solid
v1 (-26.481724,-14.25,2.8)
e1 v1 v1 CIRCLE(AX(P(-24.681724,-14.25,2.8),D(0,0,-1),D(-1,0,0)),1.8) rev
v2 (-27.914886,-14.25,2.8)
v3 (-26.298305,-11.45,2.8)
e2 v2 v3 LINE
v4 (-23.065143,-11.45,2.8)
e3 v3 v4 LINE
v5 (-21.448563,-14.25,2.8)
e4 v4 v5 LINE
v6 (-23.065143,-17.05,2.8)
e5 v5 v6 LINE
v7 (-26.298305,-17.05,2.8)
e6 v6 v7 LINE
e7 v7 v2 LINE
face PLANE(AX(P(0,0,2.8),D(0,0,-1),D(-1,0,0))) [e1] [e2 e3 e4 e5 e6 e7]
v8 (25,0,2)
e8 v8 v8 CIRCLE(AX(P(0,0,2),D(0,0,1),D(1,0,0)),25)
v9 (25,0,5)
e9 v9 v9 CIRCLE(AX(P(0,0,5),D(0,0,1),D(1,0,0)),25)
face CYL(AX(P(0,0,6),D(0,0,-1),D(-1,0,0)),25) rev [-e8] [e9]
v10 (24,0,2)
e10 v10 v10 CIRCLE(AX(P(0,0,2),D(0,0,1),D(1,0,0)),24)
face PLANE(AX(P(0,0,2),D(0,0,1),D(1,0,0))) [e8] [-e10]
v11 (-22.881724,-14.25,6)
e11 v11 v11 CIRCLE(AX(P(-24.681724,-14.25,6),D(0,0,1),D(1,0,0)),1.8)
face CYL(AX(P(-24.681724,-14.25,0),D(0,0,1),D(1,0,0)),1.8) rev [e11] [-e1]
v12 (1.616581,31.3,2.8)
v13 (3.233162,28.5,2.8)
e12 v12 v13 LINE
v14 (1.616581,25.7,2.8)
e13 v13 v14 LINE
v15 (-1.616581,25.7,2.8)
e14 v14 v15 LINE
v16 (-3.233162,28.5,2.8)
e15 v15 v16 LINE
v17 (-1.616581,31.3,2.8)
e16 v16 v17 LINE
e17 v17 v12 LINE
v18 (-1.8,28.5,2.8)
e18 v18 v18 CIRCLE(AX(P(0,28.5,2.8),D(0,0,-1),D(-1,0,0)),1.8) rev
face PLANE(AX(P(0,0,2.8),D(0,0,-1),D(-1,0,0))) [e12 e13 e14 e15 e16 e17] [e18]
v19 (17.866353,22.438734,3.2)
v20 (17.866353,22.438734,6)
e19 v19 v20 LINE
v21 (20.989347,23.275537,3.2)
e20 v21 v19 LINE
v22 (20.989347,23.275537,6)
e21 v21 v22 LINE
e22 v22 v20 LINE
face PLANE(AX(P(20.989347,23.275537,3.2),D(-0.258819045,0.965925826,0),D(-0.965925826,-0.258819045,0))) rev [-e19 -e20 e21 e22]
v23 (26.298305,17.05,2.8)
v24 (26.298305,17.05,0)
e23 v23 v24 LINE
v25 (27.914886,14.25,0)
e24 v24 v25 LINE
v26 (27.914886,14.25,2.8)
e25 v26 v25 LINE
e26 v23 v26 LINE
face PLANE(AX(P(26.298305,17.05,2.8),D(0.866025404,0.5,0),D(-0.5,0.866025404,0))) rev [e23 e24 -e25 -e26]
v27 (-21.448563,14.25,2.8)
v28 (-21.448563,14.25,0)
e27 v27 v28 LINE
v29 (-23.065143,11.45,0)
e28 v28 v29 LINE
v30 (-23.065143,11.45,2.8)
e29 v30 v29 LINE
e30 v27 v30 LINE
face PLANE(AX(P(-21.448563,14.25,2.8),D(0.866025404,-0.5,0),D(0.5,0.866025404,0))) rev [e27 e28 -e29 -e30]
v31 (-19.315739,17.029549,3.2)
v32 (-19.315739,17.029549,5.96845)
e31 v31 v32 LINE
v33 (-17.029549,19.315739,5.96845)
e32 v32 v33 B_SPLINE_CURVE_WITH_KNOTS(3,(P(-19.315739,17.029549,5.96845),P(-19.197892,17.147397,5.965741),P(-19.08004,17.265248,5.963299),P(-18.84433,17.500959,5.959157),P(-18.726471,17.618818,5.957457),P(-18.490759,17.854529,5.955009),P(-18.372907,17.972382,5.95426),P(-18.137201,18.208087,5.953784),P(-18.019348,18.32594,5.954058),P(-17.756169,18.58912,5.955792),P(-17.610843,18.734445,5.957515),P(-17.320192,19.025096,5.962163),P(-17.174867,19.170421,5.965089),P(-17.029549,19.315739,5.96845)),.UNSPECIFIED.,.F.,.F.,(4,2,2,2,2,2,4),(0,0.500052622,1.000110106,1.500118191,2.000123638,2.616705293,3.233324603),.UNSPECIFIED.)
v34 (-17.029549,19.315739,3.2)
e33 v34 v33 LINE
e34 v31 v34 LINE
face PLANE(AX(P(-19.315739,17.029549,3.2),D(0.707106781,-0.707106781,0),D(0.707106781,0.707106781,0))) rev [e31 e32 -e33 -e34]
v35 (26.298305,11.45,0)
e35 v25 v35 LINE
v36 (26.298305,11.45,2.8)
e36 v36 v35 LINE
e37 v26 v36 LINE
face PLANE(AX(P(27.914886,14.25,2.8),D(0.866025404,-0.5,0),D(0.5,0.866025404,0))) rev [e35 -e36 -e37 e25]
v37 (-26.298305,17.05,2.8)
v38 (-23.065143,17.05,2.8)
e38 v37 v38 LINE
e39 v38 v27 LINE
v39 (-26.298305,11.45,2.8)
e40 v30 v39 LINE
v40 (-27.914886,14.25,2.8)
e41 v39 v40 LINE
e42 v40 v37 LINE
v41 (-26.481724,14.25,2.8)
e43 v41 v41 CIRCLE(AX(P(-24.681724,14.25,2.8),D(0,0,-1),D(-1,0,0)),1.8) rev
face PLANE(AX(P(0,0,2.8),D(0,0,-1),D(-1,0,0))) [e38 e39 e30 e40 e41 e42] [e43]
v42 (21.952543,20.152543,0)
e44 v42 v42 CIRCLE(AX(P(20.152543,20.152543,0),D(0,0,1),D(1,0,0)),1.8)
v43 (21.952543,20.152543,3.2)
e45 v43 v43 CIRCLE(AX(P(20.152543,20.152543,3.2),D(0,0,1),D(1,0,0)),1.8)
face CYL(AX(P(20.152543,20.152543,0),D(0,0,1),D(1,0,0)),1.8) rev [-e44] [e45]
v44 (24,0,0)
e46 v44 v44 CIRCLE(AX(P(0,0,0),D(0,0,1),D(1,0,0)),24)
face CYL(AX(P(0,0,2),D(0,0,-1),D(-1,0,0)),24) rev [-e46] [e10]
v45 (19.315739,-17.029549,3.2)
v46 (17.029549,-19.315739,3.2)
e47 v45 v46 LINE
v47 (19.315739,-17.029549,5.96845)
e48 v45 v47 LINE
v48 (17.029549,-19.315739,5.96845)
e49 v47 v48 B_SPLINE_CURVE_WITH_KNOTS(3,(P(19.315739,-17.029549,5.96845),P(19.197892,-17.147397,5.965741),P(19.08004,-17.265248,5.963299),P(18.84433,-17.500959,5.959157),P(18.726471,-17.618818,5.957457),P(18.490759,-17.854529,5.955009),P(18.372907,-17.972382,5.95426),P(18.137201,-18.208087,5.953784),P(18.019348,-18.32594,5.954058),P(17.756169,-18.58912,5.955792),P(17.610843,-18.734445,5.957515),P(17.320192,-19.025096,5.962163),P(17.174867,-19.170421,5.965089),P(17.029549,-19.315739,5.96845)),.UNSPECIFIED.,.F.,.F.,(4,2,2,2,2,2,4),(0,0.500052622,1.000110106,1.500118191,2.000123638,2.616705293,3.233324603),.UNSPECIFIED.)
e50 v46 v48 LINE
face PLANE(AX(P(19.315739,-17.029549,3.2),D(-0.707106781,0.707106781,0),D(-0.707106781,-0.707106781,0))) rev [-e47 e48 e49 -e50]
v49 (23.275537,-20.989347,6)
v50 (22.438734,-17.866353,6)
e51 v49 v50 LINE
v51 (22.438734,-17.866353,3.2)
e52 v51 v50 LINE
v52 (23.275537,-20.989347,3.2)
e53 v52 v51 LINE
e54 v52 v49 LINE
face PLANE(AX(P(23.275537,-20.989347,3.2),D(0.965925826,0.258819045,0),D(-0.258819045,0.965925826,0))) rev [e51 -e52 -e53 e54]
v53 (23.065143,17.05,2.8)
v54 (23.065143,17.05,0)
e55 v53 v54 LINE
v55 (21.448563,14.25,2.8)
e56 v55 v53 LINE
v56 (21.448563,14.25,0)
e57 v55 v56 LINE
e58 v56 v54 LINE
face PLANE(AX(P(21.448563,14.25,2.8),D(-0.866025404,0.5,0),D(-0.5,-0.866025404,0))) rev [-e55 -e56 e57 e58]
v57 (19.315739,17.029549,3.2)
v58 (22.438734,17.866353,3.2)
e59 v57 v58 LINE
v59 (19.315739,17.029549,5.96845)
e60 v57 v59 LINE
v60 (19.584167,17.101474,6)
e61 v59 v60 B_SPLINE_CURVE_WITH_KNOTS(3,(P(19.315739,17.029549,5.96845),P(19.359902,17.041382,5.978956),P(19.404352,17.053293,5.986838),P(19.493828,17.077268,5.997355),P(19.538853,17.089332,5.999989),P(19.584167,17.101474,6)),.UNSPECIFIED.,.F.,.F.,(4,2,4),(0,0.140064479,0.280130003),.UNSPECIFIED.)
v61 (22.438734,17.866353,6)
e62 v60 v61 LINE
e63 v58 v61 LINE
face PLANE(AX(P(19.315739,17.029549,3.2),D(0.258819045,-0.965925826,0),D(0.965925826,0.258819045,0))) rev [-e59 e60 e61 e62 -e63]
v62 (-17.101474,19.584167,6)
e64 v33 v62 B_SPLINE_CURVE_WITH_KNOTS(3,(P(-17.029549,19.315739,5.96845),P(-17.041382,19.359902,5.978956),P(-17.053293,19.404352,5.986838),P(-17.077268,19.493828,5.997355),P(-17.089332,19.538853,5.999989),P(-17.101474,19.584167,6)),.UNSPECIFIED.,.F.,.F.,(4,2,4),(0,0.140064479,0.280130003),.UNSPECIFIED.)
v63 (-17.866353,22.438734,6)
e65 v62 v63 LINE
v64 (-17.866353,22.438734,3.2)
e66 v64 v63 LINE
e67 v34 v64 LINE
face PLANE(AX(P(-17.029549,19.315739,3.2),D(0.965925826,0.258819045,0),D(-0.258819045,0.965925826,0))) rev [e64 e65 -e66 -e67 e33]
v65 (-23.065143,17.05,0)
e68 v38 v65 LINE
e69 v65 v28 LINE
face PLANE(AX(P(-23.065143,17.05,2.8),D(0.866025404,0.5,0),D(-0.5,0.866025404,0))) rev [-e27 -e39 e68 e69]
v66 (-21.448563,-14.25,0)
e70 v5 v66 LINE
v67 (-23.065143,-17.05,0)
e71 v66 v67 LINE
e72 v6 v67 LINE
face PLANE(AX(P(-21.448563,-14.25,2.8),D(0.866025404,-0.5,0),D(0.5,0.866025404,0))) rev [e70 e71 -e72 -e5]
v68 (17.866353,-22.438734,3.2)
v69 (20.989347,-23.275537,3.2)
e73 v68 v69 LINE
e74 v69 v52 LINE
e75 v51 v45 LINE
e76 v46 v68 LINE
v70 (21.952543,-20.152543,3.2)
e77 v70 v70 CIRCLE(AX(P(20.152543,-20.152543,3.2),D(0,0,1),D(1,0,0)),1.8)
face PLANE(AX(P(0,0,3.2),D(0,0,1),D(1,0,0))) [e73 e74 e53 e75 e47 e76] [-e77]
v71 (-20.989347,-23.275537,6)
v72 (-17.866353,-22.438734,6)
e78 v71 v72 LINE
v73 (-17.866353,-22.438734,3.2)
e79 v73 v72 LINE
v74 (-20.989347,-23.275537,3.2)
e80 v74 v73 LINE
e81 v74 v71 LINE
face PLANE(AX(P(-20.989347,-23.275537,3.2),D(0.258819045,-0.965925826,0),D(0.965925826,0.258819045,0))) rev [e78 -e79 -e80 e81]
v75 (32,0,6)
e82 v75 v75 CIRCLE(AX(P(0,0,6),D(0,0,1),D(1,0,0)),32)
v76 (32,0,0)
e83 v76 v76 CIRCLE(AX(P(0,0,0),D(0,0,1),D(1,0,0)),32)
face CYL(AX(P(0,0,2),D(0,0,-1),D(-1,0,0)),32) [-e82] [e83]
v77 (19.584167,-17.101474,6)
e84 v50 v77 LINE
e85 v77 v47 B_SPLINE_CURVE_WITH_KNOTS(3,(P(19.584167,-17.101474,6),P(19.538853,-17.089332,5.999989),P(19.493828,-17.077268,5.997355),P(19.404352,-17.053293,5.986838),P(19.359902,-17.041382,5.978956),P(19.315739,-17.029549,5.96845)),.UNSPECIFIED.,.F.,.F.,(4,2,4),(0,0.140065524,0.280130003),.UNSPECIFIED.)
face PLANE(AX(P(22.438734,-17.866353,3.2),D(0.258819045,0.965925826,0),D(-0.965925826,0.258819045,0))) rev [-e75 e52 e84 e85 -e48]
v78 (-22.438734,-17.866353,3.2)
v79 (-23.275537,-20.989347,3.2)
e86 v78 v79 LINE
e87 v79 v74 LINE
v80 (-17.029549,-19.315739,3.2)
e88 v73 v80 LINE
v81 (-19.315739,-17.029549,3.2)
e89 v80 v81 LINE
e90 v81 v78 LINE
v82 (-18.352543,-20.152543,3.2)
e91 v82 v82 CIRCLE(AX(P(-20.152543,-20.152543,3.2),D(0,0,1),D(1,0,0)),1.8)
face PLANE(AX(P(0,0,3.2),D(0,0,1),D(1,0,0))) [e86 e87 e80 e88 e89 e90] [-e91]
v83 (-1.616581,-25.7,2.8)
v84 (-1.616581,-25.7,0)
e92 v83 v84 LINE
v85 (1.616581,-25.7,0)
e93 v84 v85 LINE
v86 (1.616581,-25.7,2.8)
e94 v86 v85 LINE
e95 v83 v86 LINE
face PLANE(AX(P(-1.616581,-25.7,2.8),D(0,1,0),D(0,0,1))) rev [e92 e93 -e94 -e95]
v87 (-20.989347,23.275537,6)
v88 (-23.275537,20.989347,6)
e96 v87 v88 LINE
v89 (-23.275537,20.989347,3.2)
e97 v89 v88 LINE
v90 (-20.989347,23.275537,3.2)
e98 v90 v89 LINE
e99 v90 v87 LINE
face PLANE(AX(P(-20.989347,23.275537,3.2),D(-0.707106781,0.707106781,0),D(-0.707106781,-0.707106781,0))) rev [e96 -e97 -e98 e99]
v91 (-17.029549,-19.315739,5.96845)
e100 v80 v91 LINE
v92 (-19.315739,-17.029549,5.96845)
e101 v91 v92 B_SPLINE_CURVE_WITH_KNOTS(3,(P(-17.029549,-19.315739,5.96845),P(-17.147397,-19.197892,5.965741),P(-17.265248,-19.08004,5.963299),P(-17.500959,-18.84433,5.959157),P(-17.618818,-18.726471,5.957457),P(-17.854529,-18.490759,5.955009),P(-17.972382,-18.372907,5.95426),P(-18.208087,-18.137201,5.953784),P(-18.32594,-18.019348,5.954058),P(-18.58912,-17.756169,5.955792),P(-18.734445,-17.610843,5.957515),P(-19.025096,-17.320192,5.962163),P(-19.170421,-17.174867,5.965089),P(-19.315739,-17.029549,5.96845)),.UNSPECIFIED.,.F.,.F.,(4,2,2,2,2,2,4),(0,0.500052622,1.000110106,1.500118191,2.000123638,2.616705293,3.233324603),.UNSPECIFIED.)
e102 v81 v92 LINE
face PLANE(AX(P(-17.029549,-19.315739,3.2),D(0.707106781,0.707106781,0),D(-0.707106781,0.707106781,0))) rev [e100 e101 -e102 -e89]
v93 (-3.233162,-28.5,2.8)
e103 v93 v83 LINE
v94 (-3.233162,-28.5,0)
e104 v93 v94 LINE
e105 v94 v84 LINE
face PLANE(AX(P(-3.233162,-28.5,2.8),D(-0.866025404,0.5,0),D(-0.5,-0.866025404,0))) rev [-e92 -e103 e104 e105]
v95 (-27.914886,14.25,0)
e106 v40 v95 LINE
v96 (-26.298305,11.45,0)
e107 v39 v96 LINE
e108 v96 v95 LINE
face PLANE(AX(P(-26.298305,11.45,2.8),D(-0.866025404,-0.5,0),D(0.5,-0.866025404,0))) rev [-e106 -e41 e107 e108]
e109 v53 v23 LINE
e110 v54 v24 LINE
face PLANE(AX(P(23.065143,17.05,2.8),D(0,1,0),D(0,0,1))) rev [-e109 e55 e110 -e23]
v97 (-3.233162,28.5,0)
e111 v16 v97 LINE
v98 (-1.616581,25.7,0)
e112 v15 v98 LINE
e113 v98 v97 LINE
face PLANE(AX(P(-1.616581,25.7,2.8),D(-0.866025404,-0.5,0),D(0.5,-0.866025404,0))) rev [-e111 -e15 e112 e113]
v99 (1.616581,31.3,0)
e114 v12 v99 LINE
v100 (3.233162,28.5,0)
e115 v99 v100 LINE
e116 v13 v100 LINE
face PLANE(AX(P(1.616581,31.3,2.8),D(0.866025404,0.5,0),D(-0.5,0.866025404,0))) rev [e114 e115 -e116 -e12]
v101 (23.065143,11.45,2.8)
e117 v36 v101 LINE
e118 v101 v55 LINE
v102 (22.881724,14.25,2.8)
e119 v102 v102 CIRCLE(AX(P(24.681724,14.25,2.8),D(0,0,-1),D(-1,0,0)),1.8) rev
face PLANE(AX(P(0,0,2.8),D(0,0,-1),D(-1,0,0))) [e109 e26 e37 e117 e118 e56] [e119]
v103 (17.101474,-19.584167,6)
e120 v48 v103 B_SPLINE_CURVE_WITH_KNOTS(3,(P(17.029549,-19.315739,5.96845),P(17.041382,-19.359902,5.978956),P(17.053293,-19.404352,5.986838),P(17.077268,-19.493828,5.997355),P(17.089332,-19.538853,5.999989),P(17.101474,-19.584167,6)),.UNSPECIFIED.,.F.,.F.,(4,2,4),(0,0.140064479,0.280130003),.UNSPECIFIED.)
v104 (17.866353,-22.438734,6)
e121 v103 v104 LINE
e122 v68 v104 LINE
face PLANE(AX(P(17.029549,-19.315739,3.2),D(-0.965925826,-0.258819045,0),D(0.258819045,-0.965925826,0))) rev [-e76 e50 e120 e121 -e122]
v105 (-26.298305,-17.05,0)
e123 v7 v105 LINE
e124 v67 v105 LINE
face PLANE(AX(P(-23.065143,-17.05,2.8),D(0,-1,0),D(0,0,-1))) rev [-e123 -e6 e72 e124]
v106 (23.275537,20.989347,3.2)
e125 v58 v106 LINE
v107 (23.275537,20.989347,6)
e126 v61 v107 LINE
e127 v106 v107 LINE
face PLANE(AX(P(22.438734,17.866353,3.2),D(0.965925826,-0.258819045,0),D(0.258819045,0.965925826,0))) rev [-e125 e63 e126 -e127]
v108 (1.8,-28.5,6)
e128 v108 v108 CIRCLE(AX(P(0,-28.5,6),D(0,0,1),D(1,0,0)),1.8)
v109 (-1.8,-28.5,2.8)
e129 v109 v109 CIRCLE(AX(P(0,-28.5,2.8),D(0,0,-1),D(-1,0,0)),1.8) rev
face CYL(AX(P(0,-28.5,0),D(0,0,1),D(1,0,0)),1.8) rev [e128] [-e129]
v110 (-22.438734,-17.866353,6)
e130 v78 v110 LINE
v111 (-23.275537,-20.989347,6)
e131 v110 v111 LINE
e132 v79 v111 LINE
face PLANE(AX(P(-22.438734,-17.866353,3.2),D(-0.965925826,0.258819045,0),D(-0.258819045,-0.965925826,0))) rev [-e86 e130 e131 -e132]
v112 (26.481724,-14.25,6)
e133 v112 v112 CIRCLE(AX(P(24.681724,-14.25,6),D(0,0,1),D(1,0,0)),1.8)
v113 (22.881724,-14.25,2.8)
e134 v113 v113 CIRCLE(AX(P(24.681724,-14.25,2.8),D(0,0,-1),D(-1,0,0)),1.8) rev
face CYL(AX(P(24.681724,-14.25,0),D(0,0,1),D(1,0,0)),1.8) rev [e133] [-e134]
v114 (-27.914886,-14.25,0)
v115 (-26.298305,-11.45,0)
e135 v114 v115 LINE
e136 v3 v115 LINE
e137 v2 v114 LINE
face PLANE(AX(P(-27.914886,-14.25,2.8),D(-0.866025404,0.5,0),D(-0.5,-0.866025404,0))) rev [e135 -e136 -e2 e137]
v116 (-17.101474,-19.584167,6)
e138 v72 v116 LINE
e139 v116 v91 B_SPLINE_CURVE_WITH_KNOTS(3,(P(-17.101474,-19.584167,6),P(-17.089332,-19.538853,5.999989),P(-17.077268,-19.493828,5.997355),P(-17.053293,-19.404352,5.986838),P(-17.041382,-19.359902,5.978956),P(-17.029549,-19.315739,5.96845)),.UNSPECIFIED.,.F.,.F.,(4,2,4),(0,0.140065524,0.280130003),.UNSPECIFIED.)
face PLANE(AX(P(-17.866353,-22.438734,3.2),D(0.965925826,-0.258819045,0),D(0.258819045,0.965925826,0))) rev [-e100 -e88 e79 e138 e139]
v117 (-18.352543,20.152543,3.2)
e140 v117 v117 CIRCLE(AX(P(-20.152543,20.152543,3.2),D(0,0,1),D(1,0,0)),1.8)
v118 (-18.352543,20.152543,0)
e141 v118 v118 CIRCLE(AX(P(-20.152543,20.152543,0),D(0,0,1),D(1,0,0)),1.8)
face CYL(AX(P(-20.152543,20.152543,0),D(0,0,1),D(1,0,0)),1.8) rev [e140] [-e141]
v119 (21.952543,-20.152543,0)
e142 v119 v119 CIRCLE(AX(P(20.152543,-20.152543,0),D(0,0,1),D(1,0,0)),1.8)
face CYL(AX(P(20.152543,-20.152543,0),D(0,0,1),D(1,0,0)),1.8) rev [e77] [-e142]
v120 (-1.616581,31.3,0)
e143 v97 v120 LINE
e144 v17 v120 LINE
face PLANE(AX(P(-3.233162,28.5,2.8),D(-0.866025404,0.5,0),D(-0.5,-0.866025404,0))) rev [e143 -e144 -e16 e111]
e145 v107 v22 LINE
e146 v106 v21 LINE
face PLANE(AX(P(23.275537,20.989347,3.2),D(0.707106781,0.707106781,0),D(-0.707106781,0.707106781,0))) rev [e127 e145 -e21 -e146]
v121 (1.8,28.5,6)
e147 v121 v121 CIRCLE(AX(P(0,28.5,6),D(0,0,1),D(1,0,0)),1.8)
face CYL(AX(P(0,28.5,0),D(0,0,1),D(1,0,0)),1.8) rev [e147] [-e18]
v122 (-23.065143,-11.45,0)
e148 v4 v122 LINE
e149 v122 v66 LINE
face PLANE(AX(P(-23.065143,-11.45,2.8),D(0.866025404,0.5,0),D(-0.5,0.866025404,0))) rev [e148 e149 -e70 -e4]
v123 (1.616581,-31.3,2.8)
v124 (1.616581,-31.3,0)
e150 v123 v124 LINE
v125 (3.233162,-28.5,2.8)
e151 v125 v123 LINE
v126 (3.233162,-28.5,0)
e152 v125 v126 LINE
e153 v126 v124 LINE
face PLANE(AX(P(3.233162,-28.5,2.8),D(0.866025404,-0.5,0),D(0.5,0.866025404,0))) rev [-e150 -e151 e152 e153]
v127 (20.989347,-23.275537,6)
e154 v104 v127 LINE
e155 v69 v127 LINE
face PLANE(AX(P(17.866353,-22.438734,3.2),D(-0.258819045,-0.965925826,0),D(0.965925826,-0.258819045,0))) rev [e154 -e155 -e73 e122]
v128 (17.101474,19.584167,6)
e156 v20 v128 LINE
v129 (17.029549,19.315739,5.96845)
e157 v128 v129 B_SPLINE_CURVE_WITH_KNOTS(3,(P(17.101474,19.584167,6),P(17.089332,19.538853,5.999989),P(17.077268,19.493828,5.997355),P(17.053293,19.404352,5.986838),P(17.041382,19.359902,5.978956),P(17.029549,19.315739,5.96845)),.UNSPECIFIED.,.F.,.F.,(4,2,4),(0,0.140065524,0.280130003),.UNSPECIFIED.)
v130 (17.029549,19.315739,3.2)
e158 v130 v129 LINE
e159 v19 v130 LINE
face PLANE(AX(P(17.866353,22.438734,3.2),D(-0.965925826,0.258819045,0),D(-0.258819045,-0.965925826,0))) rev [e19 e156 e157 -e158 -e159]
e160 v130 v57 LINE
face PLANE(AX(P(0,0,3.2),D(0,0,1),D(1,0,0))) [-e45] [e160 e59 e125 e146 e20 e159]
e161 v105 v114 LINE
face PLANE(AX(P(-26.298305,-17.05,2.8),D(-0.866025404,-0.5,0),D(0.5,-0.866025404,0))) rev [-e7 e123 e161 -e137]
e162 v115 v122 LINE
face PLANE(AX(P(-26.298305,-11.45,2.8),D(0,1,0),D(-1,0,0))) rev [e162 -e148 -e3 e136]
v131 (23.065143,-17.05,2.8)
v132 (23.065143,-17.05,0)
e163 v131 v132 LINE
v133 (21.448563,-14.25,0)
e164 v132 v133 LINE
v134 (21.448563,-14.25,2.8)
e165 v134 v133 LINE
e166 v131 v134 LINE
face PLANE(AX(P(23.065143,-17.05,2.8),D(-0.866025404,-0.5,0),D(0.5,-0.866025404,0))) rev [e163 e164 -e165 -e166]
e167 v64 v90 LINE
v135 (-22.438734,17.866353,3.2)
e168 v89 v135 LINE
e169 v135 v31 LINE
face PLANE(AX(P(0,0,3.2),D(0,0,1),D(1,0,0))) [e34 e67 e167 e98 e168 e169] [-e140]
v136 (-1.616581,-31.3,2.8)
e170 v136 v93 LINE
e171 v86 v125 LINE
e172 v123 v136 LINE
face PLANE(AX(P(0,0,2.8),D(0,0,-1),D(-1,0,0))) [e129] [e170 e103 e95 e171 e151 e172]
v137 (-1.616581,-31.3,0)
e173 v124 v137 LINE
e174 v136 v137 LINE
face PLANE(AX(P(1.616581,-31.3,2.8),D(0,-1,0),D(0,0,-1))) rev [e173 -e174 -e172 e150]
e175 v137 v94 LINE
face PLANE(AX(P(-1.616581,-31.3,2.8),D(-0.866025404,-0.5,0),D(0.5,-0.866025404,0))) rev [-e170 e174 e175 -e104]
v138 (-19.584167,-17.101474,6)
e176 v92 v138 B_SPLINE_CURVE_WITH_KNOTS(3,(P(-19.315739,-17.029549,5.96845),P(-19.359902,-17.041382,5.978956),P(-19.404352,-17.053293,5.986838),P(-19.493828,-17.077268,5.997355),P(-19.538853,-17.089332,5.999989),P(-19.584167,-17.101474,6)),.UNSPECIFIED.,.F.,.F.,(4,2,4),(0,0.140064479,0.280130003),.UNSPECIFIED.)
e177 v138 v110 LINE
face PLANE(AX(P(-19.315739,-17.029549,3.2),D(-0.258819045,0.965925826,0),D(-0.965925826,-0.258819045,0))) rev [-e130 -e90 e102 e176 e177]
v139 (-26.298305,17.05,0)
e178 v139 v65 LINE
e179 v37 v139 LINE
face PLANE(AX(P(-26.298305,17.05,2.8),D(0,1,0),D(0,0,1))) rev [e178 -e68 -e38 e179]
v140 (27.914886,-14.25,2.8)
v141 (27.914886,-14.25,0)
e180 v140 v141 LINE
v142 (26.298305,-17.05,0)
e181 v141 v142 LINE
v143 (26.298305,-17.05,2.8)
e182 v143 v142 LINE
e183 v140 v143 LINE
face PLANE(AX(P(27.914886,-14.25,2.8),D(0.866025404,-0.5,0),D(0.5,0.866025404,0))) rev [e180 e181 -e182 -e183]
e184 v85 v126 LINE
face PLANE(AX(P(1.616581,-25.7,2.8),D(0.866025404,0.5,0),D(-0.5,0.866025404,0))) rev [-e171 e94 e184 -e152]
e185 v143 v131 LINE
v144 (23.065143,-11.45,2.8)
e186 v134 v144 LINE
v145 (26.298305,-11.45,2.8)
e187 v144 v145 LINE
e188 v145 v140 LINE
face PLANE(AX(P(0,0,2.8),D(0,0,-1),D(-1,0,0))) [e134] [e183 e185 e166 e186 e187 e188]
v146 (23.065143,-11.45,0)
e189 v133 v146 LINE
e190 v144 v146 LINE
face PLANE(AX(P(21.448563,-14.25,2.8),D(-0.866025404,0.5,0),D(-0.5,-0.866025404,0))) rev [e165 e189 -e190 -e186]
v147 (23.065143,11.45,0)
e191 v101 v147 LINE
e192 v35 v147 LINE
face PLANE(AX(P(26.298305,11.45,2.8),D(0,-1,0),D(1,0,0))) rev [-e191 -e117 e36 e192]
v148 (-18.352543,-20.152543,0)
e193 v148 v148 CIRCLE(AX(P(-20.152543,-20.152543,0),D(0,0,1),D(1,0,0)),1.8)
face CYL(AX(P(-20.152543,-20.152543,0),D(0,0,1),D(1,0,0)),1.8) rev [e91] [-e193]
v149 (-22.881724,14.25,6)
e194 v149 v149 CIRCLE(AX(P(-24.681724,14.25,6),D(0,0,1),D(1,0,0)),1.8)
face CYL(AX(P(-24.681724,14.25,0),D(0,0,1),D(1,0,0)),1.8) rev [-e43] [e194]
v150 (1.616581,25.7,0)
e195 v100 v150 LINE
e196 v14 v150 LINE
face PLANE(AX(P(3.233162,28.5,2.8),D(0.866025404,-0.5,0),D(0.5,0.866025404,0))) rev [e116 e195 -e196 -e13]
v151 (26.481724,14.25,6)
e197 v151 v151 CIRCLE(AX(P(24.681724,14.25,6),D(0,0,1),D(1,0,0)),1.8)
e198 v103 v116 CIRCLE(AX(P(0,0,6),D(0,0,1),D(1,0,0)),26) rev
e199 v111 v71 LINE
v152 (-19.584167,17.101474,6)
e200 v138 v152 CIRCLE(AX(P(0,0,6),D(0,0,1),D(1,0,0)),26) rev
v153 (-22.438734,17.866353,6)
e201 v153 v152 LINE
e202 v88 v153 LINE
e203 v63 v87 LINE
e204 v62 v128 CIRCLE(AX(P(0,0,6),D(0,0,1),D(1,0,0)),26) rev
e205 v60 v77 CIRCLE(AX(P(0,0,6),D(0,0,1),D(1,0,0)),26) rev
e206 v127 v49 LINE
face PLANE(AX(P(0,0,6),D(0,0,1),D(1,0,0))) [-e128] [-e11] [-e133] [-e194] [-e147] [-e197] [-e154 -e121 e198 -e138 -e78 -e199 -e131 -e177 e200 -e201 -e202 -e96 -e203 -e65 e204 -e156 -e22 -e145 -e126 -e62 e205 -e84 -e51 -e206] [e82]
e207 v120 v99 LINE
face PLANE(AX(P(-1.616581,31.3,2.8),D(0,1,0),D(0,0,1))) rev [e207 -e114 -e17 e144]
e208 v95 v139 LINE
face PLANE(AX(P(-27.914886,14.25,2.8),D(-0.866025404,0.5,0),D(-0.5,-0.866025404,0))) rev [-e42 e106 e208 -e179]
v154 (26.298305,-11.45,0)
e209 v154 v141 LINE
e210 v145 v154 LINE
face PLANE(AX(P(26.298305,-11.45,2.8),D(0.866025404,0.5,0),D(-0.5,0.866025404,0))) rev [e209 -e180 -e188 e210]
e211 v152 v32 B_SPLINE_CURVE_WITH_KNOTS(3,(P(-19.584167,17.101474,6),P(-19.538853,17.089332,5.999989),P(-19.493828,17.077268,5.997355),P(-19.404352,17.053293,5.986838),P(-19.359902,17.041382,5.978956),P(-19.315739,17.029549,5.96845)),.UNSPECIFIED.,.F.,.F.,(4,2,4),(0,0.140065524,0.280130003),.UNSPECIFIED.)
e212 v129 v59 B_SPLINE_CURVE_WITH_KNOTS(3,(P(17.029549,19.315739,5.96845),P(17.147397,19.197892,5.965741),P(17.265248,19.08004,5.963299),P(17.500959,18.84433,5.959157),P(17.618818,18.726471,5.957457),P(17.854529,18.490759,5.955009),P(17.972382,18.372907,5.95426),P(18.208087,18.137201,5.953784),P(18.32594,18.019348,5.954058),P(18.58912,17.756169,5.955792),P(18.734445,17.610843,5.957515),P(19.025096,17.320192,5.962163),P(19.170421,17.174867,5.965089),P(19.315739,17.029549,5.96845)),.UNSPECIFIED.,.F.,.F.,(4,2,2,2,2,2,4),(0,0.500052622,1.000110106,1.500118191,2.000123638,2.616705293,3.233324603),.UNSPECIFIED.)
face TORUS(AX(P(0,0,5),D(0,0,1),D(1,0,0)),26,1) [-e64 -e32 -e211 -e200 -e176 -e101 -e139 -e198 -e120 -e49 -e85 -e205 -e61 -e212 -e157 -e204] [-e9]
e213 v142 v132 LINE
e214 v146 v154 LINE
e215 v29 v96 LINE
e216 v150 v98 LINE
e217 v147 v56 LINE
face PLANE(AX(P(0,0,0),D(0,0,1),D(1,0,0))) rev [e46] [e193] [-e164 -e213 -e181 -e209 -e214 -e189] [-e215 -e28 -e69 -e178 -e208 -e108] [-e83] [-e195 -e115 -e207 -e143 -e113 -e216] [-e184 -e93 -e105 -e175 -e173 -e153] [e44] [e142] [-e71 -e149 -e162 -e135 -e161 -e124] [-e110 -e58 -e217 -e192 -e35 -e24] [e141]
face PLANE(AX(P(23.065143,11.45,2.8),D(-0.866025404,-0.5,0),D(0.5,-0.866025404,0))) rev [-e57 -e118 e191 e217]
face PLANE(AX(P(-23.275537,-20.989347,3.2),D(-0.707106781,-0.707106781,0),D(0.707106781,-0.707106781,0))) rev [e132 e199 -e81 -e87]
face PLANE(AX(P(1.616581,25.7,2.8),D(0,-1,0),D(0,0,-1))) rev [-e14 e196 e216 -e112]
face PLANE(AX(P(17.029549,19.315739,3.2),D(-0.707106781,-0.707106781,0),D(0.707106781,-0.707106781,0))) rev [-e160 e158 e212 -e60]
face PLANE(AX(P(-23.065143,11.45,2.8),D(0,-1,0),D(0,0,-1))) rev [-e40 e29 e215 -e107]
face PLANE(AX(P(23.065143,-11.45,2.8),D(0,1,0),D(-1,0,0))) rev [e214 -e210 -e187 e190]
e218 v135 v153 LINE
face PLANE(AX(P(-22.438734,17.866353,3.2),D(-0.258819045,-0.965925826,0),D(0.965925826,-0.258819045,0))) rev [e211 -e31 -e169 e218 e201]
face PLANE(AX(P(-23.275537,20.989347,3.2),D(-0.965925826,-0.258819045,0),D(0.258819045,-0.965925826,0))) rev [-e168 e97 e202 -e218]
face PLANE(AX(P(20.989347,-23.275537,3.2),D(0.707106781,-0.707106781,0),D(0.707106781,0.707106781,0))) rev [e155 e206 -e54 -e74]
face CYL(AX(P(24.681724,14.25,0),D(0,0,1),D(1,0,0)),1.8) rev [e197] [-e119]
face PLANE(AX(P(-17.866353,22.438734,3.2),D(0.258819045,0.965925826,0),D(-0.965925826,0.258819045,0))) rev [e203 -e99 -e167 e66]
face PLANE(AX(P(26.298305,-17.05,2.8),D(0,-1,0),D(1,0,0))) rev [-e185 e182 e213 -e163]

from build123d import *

# Parameters (mm, degrees)
SKETCH_1_R          = 32
SKETCH_1_R_2        = 24
EXTRUDE_1_DEPTH     = 2
SKETCH_2_R          = 32
SKETCH_2_R_2        = 25
EXTRUDE_2_DEPTH     = 4
SKETCH_3_R          = 1.8
CUT_EXTRUDE_1_DEPTH = 46.650848842
CUT_EXTRUDE_2_DEPTH = 2.8
SKETCH_6_R          = 1.8
CUT_EXTRUDE_3_DEPTH = 46.367830012
CUT_EXTRUDE_4_DEPTH = 2.8
FILLET_1_R          = 1


with BuildPart() as part:
    # 草图1 → 凸台-拉伸1 (new body)
    with BuildSketch(Plane.XY):
        Circle(SKETCH_1_R)
        Circle(SKETCH_1_R_2, mode=Mode.SUBTRACT)
    extrude(amount=EXTRUDE_1_DEPTH)

    # 草图2 → 凸台-拉伸2 (add)
    with BuildSketch(Plane.XY.offset(2)):
        Circle(SKETCH_2_R)
        Circle(SKETCH_2_R_2, mode=Mode.SUBTRACT)
    extrude(amount=EXTRUDE_2_DEPTH)

    # 草图3 → 切除-拉伸1 (cut, through all)
    with BuildSketch(Plane.XY.offset(6)):
        with Locations((0, 28.5)):
            Circle(SKETCH_3_R)
        with Locations((24.681724008, 14.25)):
            Circle(SKETCH_3_R)
        with Locations((24.681724008, -14.25)):
            Circle(SKETCH_3_R)
        with Locations((0, -28.5)):
            Circle(SKETCH_3_R)
        with Locations((-24.681724008, -14.25)):
            Circle(SKETCH_3_R)
        with Locations((-24.681724008, 14.25)):
            Circle(SKETCH_3_R)
    extrude(amount=-CUT_EXTRUDE_1_DEPTH, mode=Mode.SUBTRACT)

    # 草图5 → 切除-拉伸2 (cut)
    with BuildSketch(Plane.XY.offset(6)):
        Polygon((-17.866352837, 22.43873369), (-20.989347038, 23.275537464), (-23.275537464, 20.989347038), (-22.43873369, 17.866352837), (-19.31573949, 17.029549063), (-17.029549063, 19.31573949), align=None)
        Polygon((22.43873369, 17.866352837), (23.275537464, 20.989347038), (20.989347038, 23.275537464), (17.866352837, 22.43873369), (17.029549063, 19.31573949), (19.31573949, 17.029549063), align=None)
        Polygon((17.866352837, -22.43873369), (20.989347038, -23.275537464), (23.275537464, -20.989347038), (22.43873369, -17.866352837), (19.31573949, -17.029549063), (17.029549063, -19.31573949), align=None)
        Polygon((-22.43873369, -17.866352837), (-23.275537464, -20.989347038), (-20.989347038, -23.275537464), (-17.866352837, -22.43873369), (-17.029549063, -19.31573949), (-19.31573949, -17.029549063), align=None)
    extrude(amount=-CUT_EXTRUDE_2_DEPTH, mode=Mode.SUBTRACT)

    # 草图6 → 切除-拉伸3 (cut, through all)
    with BuildSketch(Plane.XY.offset(3.2)):
        with Locations((-20.152543264, 20.152543264)):
            Circle(SKETCH_6_R)
        with Locations((20.152543264, 20.152543264)):
            Circle(SKETCH_6_R)
        with Locations((20.152543264, -20.152543264)):
            Circle(SKETCH_6_R)
        with Locations((-20.152543264, -20.152543264)):
            Circle(SKETCH_6_R)
    extrude(amount=-CUT_EXTRUDE_3_DEPTH, mode=Mode.SUBTRACT)

    # 草图7 → 切除-拉伸4 (cut)
    with BuildSketch(Plane(origin=(0, 0, 0), x_dir=(-1, 0, 0), z_dir=(0, 0, -1))):
        Polygon((3.233161507, 28.5), (1.616580754, 31.3), (-1.616580754, 31.3), (-3.233161507, 28.5), (-1.616580754, 25.7), (1.616580754, 25.7), align=None)
        Polygon((26.298304762, 11.45), (27.914885515, 14.25), (26.298304762, 17.05), (23.065143254, 17.05), (21.4485625, 14.25), (23.065143254, 11.45), align=None)
        Polygon((23.065143254, -17.05), (26.298304762, -17.05), (27.914885515, -14.25), (26.298304762, -11.45), (23.065143254, -11.45), (21.4485625, -14.25), align=None)
        Polygon((-3.233161507, -28.5), (-1.616580754, -31.3), (1.616580754, -31.3), (3.233161507, -28.5), (1.616580754, -25.7), (-1.616580754, -25.7), align=None)
        Polygon((-26.298304762, -11.45), (-27.914885515, -14.25), (-26.298304762, -17.05), (-23.065143254, -17.05), (-21.4485625, -14.25), (-23.065143254, -11.45), align=None)
        Polygon((-23.065143254, 17.05), (-26.298304762, 17.05), (-27.914885515, 14.25), (-26.298304762, 11.45), (-23.065143254, 11.45), (-21.4485625, 14.25), align=None)
    extrude(amount=-CUT_EXTRUDE_4_DEPTH, mode=Mode.SUBTRACT)

    # 圆角1
    # the kernel refuses this fillet: 1 mm, written as the material it takes off along each edge
    with BuildSketch(Plane(origin=(0, 0, 6), x_dir=(1, 0, 0), z_dir=(0, -1, 0))) as fillet_1_piece_1:
        with BuildLine():
            CenterArc((25 + FILLET_1_R, -FILLET_1_R), FILLET_1_R, 90, 90)
            Line((25, -FILLET_1_R), (25, 0))
            Line((25, 0), (25 + FILLET_1_R, 0))
        make_face()
    revolve(axis=Axis((0, 0, 6), (0, 0, 1)), mode=Mode.SUBTRACT)


solid = part.part
